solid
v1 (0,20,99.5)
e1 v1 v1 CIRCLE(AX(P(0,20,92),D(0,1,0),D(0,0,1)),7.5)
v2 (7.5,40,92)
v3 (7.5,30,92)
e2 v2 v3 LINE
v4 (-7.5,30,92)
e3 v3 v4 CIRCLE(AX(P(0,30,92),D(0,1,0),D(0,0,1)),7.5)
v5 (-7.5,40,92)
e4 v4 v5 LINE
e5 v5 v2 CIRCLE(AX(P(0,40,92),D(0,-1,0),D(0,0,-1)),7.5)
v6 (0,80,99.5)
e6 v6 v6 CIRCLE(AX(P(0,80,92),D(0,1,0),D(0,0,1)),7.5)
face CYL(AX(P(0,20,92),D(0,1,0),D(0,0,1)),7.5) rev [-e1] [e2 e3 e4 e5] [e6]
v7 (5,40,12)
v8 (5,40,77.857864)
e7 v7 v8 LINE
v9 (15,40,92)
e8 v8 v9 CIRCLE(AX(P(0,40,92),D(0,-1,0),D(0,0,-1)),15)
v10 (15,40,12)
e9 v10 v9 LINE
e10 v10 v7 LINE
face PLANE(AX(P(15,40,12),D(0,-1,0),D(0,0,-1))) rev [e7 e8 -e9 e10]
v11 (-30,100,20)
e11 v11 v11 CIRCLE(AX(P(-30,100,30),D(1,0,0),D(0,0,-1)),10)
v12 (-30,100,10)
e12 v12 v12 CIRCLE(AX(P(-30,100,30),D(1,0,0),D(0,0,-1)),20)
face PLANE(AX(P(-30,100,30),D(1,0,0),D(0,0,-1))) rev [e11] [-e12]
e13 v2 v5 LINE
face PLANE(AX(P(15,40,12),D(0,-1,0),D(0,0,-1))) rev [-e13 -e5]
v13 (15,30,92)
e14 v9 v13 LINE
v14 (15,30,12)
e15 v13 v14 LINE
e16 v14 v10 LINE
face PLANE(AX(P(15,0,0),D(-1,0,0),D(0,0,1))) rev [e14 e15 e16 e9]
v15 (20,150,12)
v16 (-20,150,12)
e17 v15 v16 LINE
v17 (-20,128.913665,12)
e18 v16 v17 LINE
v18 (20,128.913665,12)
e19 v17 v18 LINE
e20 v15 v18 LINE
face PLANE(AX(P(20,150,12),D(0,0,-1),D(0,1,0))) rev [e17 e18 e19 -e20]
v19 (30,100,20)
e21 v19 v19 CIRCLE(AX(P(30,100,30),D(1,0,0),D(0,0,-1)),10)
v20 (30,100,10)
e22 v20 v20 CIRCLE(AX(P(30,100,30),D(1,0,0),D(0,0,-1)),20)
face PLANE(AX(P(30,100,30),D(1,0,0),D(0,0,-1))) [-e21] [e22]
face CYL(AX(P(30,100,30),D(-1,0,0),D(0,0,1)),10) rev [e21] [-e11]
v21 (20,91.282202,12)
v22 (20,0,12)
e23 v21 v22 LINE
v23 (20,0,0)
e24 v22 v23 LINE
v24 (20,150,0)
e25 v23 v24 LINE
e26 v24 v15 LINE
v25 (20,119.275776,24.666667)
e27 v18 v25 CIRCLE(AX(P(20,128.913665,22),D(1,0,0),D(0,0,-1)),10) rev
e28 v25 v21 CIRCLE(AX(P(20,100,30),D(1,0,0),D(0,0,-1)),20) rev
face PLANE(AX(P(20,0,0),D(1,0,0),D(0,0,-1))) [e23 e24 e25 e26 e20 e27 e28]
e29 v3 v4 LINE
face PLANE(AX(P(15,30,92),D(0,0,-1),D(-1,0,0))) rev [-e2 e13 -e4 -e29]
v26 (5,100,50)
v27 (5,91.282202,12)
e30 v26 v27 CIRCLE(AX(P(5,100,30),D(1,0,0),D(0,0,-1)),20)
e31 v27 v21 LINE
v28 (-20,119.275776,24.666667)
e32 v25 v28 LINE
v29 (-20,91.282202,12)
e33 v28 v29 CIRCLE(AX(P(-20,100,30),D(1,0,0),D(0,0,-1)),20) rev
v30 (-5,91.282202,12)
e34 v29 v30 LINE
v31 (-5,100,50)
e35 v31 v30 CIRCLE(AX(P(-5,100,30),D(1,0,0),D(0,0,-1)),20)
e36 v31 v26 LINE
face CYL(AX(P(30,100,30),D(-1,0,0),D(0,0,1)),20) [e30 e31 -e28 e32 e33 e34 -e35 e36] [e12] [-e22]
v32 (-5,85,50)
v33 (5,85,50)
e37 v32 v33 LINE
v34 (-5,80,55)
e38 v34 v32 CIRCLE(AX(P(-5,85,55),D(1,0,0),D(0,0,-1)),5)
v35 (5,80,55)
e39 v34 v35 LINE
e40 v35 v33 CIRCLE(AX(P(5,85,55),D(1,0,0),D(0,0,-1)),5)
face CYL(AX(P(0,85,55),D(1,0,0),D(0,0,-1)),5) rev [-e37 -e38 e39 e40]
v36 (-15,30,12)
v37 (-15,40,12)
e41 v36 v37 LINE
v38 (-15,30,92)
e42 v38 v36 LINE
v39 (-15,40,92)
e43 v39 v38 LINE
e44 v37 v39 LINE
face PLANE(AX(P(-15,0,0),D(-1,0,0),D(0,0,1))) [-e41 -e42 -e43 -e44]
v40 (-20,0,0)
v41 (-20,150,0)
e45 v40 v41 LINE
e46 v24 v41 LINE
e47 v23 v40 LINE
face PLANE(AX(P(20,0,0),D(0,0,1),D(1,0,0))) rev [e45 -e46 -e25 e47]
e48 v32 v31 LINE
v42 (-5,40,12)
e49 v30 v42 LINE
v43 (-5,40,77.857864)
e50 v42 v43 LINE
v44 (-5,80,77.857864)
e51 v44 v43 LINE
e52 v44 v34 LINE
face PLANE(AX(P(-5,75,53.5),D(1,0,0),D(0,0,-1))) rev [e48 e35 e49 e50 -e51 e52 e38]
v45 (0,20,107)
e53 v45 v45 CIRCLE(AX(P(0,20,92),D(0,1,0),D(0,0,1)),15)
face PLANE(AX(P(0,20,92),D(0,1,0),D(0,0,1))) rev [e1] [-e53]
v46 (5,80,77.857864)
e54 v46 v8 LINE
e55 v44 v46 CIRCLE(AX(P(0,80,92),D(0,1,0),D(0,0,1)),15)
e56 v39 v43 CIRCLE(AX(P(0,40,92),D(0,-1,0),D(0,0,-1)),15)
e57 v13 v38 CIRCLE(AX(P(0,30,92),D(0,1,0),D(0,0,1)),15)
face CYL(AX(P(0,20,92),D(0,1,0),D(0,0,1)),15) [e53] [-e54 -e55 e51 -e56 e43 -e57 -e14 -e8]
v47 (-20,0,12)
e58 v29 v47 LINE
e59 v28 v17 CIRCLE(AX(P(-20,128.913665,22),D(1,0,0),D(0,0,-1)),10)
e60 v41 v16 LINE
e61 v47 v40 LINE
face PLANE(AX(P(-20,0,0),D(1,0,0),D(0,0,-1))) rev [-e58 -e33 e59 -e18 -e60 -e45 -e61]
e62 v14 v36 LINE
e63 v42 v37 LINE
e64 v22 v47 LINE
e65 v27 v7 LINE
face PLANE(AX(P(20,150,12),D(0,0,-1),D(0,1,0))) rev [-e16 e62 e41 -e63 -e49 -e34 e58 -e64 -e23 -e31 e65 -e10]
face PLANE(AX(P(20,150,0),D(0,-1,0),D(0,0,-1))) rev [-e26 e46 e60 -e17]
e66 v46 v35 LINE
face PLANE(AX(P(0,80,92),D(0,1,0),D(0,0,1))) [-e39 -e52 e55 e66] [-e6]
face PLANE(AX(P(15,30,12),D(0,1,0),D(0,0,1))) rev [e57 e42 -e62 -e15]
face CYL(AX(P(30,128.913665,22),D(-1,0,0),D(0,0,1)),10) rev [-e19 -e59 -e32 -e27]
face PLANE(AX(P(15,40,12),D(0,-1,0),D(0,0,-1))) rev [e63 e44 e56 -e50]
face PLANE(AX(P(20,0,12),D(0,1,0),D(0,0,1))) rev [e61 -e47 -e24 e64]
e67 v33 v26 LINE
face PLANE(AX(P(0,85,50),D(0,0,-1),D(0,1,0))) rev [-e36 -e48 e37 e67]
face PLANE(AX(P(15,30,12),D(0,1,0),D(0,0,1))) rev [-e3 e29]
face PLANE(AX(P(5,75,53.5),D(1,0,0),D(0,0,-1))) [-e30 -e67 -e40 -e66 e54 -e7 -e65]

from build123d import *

# Parameters (mm, degrees)
SKETCH1_W                = 150
SKETCH1_H                = 12
BOSS_EXTRUDE1_DEPTH      = 20
SKETCH2_R                = 20
SKETCH2_R_2              = 10
BOSS_EXTRUDE2_DEPTH      = 30
FILLET1_R                = 10
SKETCH3_W                = 10
SKETCH3_H                = 80
BOSS_EXTRUDE3_DEPTH      = 15
BOSS_EXTRUDE4_DEPTH      = 40
BOSS_EXTRUDE4_DEPTH_BACK = 20
SKETCH4_R                = 15
SKETCH4_R_2              = 7.5
RIB1_START               = -5
RIB1_DEPTH               = 10


# Read off the part's stored shape, not the designer's step: Rib1
with BuildPart() as part:
    # Sketch1 → Boss-Extrude1 (new, symmetric)
    with BuildSketch(Plane.YZ):
        with Locations((75, 6)):
            Rectangle(SKETCH1_W, SKETCH1_H)
    extrude(amount=BOSS_EXTRUDE1_DEPTH, both=True)

    # Sketch2 → Boss-Extrude2 (add, symmetric)
    with BuildSketch(Plane.YZ):
        with Locations(Location((100, 30, 0), (0, 0, 270))):
            Circle(SKETCH2_R)
        with Locations(Location((100, 30, 0), (0, 0, 270))):
            Circle(SKETCH2_R_2, mode=Mode.SUBTRACT)
    extrude(amount=BOSS_EXTRUDE2_DEPTH, both=True)

    # Fillet1
    fillet1_edges = [part.edges().sort_by_distance(p)[0] for p in [
        (0, 108.717797887, 12),
    ]]
    fillet(fillet1_edges, radius=FILLET1_R)

    # Sketch3 → Boss-Extrude3 (add, symmetric)
    with BuildSketch(Plane.YZ):
        with Locations((35, 52)):
            Rectangle(SKETCH3_W, SKETCH3_H)
    extrude(amount=BOSS_EXTRUDE3_DEPTH, both=True)

    # Sketch4 → Boss-Extrude4 (add, two sides: drawn at the far end of the back side and taken through both)
    with BuildSketch(Plane(origin=(0, 40, 0), x_dir=(-1, 0, 0), z_dir=(0, 1, 0)).offset(-BOSS_EXTRUDE4_DEPTH_BACK)):
        with Locations(Location((0, 92, 0), (0, 0, 90))):
            Circle(SKETCH4_R)
        with Locations(Location((0, 92, 0), (0, 0, 90))):
            Circle(SKETCH4_R_2, mode=Mode.SUBTRACT)
    extrude(amount=BOSS_EXTRUDE4_DEPTH + BOSS_EXTRUDE4_DEPTH_BACK)

    # Rib1 outline → Rib1 (add)
    with BuildSketch(Plane.YZ.offset(RIB1_START)):
        with BuildLine():
            ThreePointArc((85, 50), (81.464466094, 51.464466094), (80, 55))
            Line((80, 55), (80, 79))
            Line((80, 79), (40, 79))
            Line((40, 79), (40, 12))
            Line((40, 12), (91.282202113, 12))
            ThreePointArc((91.282202113, 12), (80.50641131, 34.472135955), (100, 50))
            Line((100, 50), (85, 50))
        make_face()
    extrude(amount=RIB1_DEPTH)


solid = part.part
